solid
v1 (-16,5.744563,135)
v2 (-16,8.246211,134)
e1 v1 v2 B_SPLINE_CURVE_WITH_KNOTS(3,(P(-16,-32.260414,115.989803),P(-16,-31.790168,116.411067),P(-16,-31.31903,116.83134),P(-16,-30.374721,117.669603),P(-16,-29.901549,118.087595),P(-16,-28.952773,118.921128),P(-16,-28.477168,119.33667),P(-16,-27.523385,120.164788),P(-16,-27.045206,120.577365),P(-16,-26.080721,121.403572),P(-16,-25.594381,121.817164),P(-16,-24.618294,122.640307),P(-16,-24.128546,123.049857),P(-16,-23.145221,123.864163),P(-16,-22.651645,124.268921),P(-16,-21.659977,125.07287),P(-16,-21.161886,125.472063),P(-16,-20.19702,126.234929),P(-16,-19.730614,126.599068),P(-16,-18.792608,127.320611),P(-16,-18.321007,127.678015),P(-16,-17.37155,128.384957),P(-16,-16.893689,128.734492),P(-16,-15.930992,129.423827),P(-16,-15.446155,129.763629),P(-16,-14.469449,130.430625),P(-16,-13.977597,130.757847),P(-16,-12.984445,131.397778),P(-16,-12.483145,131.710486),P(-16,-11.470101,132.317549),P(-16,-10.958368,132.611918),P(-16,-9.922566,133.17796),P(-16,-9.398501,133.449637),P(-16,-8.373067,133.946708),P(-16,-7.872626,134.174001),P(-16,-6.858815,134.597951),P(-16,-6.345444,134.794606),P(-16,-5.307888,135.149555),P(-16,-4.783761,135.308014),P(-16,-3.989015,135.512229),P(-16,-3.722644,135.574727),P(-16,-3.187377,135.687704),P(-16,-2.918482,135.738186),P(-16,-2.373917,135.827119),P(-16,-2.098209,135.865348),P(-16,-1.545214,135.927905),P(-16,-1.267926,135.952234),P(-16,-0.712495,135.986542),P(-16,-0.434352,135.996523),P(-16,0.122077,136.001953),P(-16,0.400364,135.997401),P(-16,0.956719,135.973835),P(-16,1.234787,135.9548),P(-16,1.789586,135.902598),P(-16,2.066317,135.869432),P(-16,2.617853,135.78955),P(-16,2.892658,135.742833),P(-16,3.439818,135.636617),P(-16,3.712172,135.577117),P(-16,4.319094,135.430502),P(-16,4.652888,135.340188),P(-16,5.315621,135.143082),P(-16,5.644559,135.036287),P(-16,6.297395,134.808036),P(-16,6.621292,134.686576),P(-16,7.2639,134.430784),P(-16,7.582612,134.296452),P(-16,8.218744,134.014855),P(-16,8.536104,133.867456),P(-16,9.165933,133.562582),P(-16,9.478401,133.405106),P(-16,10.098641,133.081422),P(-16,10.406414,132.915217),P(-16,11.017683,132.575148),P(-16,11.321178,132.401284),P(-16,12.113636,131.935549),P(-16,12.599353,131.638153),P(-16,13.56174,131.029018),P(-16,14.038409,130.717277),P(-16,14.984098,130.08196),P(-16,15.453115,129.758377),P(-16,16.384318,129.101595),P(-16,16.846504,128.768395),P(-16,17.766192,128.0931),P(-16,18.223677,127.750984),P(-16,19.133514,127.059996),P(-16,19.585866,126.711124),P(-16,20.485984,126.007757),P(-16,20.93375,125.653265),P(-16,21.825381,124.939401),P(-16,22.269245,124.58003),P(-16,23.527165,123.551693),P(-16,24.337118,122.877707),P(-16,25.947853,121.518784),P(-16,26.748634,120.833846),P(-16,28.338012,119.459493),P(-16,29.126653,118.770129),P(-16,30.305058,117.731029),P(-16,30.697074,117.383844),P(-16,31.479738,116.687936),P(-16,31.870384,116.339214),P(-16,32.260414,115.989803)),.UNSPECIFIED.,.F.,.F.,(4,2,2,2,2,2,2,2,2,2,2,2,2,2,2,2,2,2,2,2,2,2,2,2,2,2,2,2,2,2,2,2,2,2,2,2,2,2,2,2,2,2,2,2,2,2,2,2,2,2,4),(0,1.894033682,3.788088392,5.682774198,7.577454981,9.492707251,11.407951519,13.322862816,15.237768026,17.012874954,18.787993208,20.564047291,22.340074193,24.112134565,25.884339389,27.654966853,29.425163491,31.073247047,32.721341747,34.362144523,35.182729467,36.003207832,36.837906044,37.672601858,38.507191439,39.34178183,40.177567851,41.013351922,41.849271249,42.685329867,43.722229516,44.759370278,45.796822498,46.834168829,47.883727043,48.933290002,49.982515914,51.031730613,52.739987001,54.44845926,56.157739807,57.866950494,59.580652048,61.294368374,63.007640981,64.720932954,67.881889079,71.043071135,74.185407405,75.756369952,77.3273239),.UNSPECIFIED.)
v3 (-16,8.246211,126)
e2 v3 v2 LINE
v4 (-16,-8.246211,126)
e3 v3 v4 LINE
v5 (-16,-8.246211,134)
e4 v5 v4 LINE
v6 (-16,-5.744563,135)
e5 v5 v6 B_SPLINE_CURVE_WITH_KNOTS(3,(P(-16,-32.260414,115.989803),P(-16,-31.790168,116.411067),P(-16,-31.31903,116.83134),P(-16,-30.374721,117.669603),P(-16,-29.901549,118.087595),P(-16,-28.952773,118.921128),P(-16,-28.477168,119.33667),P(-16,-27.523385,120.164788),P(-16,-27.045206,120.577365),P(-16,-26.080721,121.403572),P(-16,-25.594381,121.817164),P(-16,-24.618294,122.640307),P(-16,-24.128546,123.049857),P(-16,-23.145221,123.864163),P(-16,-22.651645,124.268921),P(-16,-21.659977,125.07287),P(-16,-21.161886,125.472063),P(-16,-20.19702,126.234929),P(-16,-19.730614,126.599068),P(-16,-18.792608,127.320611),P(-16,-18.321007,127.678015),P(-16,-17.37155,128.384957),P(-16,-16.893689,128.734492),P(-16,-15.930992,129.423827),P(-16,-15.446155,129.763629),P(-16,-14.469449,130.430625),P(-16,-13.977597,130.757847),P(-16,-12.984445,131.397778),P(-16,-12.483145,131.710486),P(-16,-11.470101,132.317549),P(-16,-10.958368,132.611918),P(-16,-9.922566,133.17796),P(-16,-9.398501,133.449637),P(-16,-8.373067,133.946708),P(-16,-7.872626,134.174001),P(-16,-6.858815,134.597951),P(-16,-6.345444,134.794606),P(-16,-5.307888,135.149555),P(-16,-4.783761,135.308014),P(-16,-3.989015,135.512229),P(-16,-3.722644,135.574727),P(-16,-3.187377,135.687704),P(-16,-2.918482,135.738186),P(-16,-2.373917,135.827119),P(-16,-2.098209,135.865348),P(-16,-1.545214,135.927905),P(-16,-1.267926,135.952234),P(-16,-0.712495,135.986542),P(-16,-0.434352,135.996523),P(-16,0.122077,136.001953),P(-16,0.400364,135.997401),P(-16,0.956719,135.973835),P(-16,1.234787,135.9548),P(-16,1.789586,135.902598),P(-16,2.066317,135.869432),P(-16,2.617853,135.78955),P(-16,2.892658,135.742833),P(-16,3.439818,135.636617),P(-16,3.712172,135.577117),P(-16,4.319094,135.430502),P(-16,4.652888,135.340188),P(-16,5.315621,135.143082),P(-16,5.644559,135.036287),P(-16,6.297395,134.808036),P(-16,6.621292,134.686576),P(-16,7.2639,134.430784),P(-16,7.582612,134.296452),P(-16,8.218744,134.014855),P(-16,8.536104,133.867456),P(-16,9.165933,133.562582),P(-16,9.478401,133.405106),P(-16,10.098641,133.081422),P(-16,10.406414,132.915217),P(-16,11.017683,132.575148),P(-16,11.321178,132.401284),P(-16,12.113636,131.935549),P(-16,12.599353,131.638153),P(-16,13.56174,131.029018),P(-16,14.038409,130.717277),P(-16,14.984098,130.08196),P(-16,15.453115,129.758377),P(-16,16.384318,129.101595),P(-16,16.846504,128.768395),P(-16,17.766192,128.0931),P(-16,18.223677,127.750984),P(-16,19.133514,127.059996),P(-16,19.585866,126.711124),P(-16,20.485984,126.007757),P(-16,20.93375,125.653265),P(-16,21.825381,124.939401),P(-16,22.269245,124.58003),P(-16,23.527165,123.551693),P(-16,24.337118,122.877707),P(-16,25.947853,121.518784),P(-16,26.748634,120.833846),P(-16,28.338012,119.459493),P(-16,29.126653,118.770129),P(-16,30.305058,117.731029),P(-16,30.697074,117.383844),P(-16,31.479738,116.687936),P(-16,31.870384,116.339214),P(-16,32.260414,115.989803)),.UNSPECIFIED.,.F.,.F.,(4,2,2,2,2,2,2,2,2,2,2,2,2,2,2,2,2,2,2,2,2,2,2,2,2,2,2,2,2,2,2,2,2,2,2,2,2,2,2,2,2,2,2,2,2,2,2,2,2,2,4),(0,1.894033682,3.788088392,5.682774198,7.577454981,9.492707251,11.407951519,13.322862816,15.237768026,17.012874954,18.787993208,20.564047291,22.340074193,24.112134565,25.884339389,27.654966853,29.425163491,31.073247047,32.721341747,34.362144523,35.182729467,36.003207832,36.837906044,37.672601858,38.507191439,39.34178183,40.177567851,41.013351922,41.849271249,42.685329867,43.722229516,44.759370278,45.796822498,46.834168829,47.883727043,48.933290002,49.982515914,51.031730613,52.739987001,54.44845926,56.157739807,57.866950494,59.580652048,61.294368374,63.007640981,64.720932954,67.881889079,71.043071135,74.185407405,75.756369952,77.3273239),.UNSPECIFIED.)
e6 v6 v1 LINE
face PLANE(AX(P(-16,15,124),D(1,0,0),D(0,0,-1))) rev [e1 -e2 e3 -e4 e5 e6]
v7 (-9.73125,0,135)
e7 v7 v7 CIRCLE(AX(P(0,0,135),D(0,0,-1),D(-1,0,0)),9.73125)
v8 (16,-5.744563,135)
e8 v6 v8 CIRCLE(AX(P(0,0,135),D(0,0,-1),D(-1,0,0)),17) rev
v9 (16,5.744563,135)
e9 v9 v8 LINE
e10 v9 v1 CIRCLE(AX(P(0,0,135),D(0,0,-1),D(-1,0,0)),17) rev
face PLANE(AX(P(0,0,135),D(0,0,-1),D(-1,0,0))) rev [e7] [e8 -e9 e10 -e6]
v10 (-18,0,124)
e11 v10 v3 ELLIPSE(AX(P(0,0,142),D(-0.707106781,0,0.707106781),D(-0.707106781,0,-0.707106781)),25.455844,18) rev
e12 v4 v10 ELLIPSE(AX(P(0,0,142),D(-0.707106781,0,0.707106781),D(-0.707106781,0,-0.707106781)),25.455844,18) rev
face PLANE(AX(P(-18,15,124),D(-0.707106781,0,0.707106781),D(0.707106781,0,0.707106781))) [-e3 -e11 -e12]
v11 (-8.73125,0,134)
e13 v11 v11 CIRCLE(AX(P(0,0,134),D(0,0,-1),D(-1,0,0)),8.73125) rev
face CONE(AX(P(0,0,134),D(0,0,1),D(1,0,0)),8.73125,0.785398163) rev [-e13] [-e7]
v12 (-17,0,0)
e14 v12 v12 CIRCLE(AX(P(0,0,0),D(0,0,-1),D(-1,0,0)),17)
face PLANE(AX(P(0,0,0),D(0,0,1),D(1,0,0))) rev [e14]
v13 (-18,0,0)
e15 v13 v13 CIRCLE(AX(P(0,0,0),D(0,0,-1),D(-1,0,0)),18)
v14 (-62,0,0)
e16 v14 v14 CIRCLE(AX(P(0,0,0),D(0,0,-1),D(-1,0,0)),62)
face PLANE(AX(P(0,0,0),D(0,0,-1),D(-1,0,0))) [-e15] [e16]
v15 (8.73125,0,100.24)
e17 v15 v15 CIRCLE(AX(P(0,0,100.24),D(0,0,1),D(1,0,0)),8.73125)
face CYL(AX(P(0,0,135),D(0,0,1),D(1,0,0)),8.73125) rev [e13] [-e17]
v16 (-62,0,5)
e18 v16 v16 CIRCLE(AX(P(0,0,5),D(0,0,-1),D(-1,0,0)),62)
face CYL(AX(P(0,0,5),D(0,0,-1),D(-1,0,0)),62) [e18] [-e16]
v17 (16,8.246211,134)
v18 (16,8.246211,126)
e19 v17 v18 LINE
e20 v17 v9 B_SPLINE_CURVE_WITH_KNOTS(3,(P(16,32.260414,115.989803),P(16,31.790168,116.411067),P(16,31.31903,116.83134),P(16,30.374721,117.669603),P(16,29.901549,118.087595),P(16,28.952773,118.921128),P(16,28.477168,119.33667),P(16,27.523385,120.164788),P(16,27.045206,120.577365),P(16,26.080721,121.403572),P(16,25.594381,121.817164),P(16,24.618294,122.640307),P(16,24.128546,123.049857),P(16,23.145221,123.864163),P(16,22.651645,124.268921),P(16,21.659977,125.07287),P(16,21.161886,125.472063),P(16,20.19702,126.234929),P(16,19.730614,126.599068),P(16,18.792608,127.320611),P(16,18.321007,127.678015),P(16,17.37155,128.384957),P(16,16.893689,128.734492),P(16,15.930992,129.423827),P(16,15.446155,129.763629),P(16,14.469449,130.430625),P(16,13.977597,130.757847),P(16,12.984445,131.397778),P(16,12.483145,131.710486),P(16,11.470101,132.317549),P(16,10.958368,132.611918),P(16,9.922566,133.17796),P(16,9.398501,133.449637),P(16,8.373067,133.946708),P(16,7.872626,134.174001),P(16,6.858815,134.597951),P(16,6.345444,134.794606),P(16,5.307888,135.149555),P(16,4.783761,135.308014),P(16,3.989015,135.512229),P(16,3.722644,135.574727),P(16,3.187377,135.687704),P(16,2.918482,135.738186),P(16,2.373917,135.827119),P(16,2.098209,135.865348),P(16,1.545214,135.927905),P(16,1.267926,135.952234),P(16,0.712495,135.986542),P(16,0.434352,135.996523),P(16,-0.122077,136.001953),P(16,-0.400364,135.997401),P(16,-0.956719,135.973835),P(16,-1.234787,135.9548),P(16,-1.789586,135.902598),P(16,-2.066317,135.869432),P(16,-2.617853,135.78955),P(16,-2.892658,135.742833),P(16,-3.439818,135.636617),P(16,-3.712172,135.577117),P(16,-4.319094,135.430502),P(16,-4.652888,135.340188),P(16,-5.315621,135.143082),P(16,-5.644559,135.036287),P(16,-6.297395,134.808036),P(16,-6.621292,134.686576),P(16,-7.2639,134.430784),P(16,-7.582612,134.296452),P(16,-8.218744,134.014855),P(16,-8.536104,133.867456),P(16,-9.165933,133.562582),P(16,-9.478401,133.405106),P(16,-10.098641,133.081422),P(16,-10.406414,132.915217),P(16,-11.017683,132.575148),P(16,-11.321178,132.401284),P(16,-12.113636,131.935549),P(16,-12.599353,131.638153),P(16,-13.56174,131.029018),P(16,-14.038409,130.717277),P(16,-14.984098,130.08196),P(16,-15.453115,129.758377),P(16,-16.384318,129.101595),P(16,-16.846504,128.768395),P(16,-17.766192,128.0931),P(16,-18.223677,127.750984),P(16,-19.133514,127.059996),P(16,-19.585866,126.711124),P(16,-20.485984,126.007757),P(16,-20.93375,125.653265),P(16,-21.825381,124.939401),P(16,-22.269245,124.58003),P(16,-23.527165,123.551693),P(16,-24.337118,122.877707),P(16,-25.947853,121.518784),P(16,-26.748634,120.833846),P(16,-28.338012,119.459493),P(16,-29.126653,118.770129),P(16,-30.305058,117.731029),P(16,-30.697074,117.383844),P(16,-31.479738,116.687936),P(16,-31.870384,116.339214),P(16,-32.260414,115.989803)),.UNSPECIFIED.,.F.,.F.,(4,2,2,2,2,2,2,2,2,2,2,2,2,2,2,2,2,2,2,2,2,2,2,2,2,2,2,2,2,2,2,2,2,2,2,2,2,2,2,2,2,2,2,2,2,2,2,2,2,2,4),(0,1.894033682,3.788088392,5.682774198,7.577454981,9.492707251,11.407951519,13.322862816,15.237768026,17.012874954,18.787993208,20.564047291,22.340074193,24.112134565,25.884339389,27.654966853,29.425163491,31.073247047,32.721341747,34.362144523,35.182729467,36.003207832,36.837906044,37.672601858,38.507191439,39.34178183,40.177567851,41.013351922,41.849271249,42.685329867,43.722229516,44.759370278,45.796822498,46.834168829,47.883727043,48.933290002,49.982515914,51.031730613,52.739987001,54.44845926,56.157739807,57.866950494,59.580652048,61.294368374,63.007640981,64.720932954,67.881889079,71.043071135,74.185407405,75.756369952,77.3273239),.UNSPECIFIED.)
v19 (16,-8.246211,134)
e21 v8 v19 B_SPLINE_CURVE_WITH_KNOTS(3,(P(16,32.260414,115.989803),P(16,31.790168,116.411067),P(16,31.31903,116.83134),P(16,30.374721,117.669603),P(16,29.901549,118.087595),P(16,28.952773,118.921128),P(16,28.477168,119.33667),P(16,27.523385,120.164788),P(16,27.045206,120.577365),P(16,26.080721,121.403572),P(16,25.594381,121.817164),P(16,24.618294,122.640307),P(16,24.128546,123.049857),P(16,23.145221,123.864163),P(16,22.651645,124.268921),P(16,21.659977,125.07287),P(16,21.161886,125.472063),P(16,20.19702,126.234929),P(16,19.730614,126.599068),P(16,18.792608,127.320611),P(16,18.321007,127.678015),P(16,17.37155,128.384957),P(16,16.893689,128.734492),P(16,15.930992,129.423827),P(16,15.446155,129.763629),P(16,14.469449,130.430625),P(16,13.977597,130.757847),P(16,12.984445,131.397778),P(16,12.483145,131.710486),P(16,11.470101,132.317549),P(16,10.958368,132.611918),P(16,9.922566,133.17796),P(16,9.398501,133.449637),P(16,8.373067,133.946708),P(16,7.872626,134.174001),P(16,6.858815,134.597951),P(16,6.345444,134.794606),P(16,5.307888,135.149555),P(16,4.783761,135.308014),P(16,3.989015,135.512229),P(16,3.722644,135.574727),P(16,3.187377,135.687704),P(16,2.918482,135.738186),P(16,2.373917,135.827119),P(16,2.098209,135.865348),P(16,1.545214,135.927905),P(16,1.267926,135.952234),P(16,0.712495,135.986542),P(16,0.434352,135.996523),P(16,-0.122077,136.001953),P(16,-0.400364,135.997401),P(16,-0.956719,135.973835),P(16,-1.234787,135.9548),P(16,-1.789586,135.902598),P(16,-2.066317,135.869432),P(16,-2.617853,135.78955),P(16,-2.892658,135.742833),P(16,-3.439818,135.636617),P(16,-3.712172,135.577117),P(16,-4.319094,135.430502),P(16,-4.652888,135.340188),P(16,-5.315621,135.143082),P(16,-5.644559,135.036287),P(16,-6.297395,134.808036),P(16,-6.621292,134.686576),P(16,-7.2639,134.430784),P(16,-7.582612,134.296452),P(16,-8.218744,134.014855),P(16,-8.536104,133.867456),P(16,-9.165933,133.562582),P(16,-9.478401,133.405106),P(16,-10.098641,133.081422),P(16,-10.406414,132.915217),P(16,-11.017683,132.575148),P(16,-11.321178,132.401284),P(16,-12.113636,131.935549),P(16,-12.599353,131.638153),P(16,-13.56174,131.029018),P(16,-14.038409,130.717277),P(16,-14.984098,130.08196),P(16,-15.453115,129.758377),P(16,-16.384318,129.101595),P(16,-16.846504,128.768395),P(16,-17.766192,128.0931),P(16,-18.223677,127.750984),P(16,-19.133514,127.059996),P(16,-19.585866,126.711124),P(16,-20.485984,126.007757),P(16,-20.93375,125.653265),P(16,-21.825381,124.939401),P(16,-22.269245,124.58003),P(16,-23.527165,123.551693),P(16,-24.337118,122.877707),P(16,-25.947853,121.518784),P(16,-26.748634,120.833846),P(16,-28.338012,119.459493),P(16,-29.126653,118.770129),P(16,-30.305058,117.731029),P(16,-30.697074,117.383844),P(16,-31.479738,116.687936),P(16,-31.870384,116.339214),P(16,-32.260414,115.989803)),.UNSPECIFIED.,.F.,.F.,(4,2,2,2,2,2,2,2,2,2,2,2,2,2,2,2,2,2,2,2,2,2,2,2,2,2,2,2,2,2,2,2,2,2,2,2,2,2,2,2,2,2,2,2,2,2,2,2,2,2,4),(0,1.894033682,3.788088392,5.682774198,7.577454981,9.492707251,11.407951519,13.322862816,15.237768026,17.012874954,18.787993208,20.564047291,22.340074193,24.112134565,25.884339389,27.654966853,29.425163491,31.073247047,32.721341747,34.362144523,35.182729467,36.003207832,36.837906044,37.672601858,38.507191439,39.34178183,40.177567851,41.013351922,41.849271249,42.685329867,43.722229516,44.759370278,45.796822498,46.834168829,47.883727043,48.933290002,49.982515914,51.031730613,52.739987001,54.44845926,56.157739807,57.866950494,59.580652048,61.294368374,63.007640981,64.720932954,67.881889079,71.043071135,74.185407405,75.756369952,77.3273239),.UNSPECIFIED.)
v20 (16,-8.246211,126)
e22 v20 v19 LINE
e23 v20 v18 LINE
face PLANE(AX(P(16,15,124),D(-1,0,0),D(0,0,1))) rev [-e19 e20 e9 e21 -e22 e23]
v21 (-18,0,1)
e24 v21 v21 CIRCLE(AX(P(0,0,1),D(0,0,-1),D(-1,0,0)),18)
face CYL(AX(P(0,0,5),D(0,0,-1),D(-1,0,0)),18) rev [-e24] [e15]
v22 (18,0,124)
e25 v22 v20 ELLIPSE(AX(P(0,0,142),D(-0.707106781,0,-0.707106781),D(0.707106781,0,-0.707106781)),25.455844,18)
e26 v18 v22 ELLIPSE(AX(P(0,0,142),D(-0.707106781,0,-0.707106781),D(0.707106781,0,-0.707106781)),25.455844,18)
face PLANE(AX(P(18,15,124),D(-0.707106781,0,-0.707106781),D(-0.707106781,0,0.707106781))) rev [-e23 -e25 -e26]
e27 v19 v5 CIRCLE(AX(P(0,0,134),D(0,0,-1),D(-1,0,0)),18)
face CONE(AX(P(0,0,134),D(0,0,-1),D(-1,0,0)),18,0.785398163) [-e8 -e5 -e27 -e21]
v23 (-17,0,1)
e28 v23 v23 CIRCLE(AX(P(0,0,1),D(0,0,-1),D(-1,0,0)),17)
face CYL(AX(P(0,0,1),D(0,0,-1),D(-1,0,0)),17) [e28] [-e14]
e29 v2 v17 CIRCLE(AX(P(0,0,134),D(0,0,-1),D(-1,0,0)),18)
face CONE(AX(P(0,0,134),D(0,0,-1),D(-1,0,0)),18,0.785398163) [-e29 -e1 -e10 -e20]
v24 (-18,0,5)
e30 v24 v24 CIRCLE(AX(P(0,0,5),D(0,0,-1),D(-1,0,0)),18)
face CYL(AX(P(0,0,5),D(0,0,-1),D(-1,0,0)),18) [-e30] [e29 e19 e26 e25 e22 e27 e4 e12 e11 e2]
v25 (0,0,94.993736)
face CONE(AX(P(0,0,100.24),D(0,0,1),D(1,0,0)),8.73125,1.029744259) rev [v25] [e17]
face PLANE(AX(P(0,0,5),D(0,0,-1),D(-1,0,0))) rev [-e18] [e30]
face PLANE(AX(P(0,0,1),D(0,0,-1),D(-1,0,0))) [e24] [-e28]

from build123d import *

# Parameters (mm, degrees)
SKETCH1_R                   = 18
BASE_EXTRUDE_DEPTH          = 5
SKETCH6_R                   = 18
SKETCH6_R_2                 = 17
CUT_EXTRUDE1_DEPTH          = 1
SKETCH7_R                   = 18
BOSS_EXTRUDE1_DEPTH         = 130
CHAMFER1_SIZE               = 1
SKETCH2_W                   = 10
SKETCH2_H                   = 30
WRENCHFLATS_DEPTH           = 11
WRENCHFLATSCHAMFER_SIZE     = 2
SKETCH3_R                   = 5
INTERNALTHREAD_DEPTH        = 30
INTERNALTHREADCHAMFER_SIZE  = 1.2
PISTON_OUTLINE_W            = 44
PISTON_OUTLINE_H            = 5
F_3_4_16_TAPPED_HOLE1_D     = 17.4625
F_3_4_16_TAPPED_HOLE1_DEPTH = 34.76
F_3_4_16_TAPPED_HOLE1_TIP   = 5.24626428
CHAMFER2_SIZE               = 1


# Read off the part's stored shape, not the designer's step: Piston
with BuildPart() as part:
    # Sketch1 → Base-Extrude (new body)
    with BuildSketch(Plane.XY):
        Circle(SKETCH1_R)
    extrude(amount=BASE_EXTRUDE_DEPTH)

    # Sketch6 → Cut-Extrude1 (cut)
    with BuildSketch(Plane(origin=(0, 0, 0), x_dir=(-1, 0, 0), z_dir=(0, 0, -1))):
        Circle(SKETCH6_R)
        Circle(SKETCH6_R_2, mode=Mode.SUBTRACT)
    extrude(amount=-CUT_EXTRUDE1_DEPTH, mode=Mode.SUBTRACT)

    # Sketch7 → Boss-Extrude1 (add)
    with BuildSketch(Plane.XY.offset(5)):
        with Locations(Location((0, 0, 0), (0, 0, 180))):
            Circle(SKETCH7_R)
    extrude(amount=BOSS_EXTRUDE1_DEPTH)

    # Chamfer1
    chamfer1_edges = [part.edges().sort_by_distance(p)[0] for p in [
        (18, 0, 135),
    ]]
    chamfer(chamfer1_edges, length=CHAMFER1_SIZE)

    # Sketch2 → WrenchFlats (cut)
    with BuildSketch(Plane.XY.offset(135)):
        with Locations((21, 0)):
            Rectangle(SKETCH2_W, SKETCH2_H)
        with Locations((-21, 0)):
            Rectangle(SKETCH2_W, SKETCH2_H)
    extrude(amount=-WRENCHFLATS_DEPTH, mode=Mode.SUBTRACT)

    # WrenchFlatsChamfer
    wrenchflatschamfer_edges = [part.edges().sort_by_distance(p)[0] for p in [
        (16, 0, 124),
        (-16, 0, 124),
    ]]
    chamfer(wrenchflatschamfer_edges, length=WRENCHFLATSCHAMFER_SIZE - 0.0001)  # a hair under: the kernel refuses the full size

    # Sketch3 → InternalThread (cut)
    with BuildSketch(Plane.XY.offset(135)):
        Circle(SKETCH3_R)
    extrude(amount=-INTERNALTHREAD_DEPTH, mode=Mode.SUBTRACT)

    # InternalThreadChamfer
    internalthreadchamfer_edges = [part.edges().sort_by_distance(p)[0] for p in [
        (-5, 0, 135),
    ]]
    chamfer(internalthreadchamfer_edges, length=INTERNALTHREADCHAMFER_SIZE)

    # Piston outline → Piston (revolve)
    with BuildSketch(Plane.XZ):
        with Locations((40, 2.5)):
            Rectangle(PISTON_OUTLINE_W, PISTON_OUTLINE_H)
    revolve(axis=Axis((0, 0, 0), (0, 0, 1)))

    # 3/4-16 Tapped Hole1
    with Locations(Plane.XY.offset(135)):
        with Locations((0, 0)):
            Hole(F_3_4_16_TAPPED_HOLE1_D / 2, depth=F_3_4_16_TAPPED_HOLE1_DEPTH)
            with Locations((0, 0, -(F_3_4_16_TAPPED_HOLE1_DEPTH + F_3_4_16_TAPPED_HOLE1_TIP / 2))):  # 118° drill point
                Cone(0, F_3_4_16_TAPPED_HOLE1_D / 2, F_3_4_16_TAPPED_HOLE1_TIP, mode=Mode.SUBTRACT)

    # Chamfer2
    chamfer2_edges = [part.edges().sort_by_distance(p)[0] for p in [
        (8.73125, 0, 135),
    ]]
    chamfer(chamfer2_edges, length=CHAMFER2_SIZE)


solid = part.part
